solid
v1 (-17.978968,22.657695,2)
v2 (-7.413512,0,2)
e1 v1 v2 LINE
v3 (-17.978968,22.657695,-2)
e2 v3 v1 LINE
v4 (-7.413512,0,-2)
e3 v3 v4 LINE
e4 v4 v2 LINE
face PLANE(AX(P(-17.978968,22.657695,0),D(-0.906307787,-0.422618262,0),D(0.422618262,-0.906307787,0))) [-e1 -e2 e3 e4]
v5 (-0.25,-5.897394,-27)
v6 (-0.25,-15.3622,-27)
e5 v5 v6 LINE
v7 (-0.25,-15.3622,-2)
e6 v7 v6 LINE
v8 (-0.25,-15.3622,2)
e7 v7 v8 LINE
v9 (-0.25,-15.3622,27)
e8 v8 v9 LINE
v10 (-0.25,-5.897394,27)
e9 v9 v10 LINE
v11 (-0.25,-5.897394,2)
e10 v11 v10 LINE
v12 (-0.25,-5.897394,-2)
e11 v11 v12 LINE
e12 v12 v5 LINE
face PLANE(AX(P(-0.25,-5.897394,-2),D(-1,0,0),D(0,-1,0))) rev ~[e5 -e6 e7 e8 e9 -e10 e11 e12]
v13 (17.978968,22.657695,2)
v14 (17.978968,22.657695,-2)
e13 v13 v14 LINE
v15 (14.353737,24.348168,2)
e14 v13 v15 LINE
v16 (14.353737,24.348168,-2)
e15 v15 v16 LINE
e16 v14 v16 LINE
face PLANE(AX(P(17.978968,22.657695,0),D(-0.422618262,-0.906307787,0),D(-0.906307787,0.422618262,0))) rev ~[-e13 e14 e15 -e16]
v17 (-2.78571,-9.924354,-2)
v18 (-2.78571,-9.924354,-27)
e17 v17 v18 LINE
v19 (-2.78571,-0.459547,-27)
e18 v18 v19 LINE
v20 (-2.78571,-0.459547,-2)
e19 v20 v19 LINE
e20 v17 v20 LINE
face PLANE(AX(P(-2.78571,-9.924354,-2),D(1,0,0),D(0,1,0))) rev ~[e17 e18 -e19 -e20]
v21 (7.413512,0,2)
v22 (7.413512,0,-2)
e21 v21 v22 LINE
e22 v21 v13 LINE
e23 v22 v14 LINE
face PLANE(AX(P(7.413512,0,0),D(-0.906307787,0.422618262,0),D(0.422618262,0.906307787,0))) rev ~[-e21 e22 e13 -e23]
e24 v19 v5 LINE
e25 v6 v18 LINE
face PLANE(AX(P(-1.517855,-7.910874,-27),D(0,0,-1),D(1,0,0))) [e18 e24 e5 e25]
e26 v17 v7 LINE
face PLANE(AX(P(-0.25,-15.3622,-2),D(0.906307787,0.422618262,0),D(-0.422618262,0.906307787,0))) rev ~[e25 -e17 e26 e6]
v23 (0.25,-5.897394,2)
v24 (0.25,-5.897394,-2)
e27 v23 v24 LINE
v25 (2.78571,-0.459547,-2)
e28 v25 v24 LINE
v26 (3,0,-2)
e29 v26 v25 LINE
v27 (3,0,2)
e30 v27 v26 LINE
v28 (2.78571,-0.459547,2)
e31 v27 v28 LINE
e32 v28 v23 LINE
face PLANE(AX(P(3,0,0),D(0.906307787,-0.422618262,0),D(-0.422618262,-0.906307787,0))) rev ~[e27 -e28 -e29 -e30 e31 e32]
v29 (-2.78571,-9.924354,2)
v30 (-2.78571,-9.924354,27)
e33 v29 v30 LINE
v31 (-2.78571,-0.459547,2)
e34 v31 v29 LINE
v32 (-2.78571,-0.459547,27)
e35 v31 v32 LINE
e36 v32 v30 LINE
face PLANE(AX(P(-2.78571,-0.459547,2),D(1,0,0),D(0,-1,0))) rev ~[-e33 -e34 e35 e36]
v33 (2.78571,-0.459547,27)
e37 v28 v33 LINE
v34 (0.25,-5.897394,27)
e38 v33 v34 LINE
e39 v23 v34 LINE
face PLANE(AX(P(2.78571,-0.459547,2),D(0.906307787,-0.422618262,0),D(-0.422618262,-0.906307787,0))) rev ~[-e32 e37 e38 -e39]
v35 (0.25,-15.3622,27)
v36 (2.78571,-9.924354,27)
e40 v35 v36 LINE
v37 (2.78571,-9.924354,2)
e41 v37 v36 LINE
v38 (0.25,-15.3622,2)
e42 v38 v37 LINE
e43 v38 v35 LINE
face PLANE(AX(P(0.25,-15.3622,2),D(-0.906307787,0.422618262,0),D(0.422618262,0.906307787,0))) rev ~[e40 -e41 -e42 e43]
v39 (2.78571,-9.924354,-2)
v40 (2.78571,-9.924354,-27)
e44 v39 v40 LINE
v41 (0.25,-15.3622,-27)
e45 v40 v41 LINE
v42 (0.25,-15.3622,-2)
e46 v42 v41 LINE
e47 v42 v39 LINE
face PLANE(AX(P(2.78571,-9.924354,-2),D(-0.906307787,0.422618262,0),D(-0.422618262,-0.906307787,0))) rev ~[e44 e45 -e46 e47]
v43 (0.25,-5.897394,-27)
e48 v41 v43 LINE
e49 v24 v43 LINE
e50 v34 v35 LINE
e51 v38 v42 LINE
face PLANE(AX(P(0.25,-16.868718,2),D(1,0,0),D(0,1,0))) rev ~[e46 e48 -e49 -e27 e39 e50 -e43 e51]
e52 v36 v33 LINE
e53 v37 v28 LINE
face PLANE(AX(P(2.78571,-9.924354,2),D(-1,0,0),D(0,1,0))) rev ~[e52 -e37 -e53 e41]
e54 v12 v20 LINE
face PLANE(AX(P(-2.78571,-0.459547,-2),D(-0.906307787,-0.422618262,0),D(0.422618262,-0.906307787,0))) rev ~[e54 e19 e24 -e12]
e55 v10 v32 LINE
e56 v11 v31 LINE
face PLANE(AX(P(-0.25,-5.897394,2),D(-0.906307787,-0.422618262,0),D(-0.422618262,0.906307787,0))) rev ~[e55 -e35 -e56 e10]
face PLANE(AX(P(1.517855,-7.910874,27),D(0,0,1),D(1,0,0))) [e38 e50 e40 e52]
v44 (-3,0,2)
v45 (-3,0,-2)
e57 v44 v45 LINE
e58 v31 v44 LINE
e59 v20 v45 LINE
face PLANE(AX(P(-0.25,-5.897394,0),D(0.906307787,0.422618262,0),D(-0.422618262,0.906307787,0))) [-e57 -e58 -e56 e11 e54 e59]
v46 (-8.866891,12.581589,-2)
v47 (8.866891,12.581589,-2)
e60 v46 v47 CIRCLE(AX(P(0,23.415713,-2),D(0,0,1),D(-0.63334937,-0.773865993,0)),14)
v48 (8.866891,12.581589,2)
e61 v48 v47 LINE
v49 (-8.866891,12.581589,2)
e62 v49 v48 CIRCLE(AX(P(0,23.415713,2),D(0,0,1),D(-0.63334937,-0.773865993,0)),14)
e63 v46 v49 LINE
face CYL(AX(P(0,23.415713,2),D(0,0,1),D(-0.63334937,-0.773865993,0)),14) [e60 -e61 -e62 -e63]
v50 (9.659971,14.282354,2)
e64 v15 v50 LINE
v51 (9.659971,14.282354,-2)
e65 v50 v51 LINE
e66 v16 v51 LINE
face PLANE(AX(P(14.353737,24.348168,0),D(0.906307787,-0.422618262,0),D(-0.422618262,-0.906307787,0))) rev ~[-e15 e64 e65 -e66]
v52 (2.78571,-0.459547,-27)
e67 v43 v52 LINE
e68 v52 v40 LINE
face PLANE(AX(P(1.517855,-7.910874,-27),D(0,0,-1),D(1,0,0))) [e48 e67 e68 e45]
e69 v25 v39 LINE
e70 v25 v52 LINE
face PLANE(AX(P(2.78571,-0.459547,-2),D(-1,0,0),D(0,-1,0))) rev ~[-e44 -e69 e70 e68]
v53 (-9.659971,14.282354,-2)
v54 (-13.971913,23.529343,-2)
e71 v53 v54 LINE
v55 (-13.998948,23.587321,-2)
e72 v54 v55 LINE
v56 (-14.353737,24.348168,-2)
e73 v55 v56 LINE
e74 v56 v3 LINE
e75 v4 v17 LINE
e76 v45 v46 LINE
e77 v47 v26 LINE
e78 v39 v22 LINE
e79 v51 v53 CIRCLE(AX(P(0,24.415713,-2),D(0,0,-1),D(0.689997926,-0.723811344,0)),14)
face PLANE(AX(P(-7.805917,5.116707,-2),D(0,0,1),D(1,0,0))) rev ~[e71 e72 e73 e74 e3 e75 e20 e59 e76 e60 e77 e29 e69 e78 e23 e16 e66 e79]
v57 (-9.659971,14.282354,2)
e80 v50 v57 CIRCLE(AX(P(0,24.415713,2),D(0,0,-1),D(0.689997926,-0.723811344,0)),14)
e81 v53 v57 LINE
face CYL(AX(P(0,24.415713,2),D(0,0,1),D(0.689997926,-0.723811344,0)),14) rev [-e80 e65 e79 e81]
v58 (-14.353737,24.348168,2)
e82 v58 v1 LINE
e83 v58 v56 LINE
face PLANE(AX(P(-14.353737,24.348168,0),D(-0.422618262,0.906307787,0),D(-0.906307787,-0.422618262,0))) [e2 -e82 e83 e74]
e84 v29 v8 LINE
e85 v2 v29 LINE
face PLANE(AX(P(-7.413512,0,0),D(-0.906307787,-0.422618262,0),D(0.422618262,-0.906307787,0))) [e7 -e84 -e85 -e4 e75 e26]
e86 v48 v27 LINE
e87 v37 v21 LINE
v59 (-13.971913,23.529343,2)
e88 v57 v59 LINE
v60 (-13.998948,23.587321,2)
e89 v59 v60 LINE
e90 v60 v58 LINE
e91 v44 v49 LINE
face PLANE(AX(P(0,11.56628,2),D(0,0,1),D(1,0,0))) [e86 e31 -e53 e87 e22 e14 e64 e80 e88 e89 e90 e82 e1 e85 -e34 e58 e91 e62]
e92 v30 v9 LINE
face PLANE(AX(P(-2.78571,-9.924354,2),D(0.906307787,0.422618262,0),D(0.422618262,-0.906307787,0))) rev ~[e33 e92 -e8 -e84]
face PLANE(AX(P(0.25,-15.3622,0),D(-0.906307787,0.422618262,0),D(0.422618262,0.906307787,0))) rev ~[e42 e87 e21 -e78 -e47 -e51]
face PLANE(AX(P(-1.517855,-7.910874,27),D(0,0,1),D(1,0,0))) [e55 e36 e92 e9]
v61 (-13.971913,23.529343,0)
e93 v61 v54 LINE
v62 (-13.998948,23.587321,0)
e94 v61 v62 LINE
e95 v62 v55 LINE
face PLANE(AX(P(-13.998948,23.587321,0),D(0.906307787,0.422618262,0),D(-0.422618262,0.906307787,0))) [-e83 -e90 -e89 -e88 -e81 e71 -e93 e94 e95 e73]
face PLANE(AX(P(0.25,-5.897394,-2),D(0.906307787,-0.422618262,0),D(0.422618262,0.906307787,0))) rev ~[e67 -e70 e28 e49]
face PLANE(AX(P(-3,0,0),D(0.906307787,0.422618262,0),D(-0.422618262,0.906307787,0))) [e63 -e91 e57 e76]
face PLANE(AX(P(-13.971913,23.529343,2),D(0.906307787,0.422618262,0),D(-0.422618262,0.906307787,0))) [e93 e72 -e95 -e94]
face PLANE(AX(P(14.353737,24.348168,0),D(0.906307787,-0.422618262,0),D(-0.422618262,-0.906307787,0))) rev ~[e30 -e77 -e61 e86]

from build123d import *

# Parameters (mm, degrees)
F1_DEPTH  = 2
F3_DEPTH  = 4
F4_W      = 0.5
F4_H      = 15
F5_DEPTH  = 25
F6_DEPTH  = 2
F8_DEPTH  = 25
F10_DEPTH = 25


with BuildPart() as f1:
    # F0 (on Top) → F1 (new body)
    with BuildSketch(Plane.XY):
        Polygon((-7.4135116758, 0), (-0.25, -15.362200364), (-0.25, -5.8973940314), (-3, 0), (-14.3537370712, 24.3481677229), (-17.9789682194, 22.6576946759), align=None)
        Polygon((0.25, -15.362200364), (7.4135116758, 0), (17.9789682194, 22.6576946759), (14.3537370712, 24.3481677229), (3, 0), (0.25, -5.8973940314), align=None)
        Polygon((0, -15.8983270941), (0.25, -15.362200364), (0.25, -5.8973940314), (0, -6.4335207615), (-0.25, -5.8973940314), (-0.25, -15.362200364), align=None)
    extrude(amount=F1_DEPTH)

    # F2 (on face) → F3 (join)
    with BuildSketch(Plane.XY.offset(2)):
        with BuildLine():
            ThreePointArc((-8.8668911775, 12.581588732), (0, 9.4157126397), (8.8668911775, 12.581588732))
            Line((8.8668911775, 12.581588732), (9.6599709615, 14.2823538173))
            ThreePointArc((9.6599709615, 14.2823538173), (0, 10.4157126397), (-9.6599709615, 14.2823538173))
            Line((-9.6599709615, 14.2823538173), (-8.8668911775, 12.581588732))
        make_face()
        with BuildLine():
            ThreePointArc((-13.9989482009, 23.5873205351), (-12.6883090185, 17.4990569753), (-8.8668911775, 12.581588732))
            Line((-8.8668911775, 12.581588732), (-9.6599709615, 14.2823538173))
            ThreePointArc((-9.6599709615, 14.2823538173), (-12.6883090185, 18.4990569753), (-13.97191286, 23.5293430595))
            Line((-13.97191286, 23.5293430595), (-13.9989482009, 23.5873205351))
        make_face()
        with BuildLine():
            ThreePointArc((-13.97191286, 23.5293430595), (-12.6883090185, 18.4990569753), (-9.6599709615, 14.2823538173))
            Line((-9.6599709615, 14.2823538173), (-13.97191286, 23.5293430595))
        make_face()
    extrude(amount=-F3_DEPTH)

    # F4 (on face) → F5 (cut)
    with BuildSketch(Plane.XY.offset(2)):
        with Locations((0, -9.3687182158)):
            Rectangle(F4_W, F4_H)
    extrude(amount=-F5_DEPTH, mode=Mode.SUBTRACT)

    # F6 (add): faces of the model
    f6_faces = [f1.faces().sort_by_distance(p)[0] for p in [
        (-7.9421134858, 5.393960994, 0),
        (8.2425809304, 6.3306998172, 0),
    ]]
    extrude(f6_faces, amount=F6_DEPTH)

    # F7 (on face) → F8 (join)
    with BuildSketch(Plane.XY.offset(2)):
        Polygon((-0.25, -5.8973940314), (-2.7857095704, -0.4595473092), (-2.7857095704, -9.9243536418), (-0.25, -15.362200364), align=None)
        Polygon((2.7857095704, -9.9243536418), (2.7857095704, -0.4595473092), (0.25, -5.8973940314), (0.25, -15.362200364), align=None)
    extrude(amount=F8_DEPTH)

    # F9 (on face) → F10 (join)
    with BuildSketch(Plane(origin=(0, 0, -2), x_dir=(1, 0, 0), z_dir=(0, 0, -1))):
        Polygon((-0.25, 15.362200364), (-2.7857095704, 9.9243536418), (-2.7857095704, 0.4595473092), (-0.25, 5.8973940314), align=None)
        Polygon((0.25, 5.8973940314), (2.7857095704, 0.4595473092), (2.7857095704, 9.9243536418), (0.25, 15.362200364), align=None)
    extrude(amount=F10_DEPTH)


solid = f1.part
